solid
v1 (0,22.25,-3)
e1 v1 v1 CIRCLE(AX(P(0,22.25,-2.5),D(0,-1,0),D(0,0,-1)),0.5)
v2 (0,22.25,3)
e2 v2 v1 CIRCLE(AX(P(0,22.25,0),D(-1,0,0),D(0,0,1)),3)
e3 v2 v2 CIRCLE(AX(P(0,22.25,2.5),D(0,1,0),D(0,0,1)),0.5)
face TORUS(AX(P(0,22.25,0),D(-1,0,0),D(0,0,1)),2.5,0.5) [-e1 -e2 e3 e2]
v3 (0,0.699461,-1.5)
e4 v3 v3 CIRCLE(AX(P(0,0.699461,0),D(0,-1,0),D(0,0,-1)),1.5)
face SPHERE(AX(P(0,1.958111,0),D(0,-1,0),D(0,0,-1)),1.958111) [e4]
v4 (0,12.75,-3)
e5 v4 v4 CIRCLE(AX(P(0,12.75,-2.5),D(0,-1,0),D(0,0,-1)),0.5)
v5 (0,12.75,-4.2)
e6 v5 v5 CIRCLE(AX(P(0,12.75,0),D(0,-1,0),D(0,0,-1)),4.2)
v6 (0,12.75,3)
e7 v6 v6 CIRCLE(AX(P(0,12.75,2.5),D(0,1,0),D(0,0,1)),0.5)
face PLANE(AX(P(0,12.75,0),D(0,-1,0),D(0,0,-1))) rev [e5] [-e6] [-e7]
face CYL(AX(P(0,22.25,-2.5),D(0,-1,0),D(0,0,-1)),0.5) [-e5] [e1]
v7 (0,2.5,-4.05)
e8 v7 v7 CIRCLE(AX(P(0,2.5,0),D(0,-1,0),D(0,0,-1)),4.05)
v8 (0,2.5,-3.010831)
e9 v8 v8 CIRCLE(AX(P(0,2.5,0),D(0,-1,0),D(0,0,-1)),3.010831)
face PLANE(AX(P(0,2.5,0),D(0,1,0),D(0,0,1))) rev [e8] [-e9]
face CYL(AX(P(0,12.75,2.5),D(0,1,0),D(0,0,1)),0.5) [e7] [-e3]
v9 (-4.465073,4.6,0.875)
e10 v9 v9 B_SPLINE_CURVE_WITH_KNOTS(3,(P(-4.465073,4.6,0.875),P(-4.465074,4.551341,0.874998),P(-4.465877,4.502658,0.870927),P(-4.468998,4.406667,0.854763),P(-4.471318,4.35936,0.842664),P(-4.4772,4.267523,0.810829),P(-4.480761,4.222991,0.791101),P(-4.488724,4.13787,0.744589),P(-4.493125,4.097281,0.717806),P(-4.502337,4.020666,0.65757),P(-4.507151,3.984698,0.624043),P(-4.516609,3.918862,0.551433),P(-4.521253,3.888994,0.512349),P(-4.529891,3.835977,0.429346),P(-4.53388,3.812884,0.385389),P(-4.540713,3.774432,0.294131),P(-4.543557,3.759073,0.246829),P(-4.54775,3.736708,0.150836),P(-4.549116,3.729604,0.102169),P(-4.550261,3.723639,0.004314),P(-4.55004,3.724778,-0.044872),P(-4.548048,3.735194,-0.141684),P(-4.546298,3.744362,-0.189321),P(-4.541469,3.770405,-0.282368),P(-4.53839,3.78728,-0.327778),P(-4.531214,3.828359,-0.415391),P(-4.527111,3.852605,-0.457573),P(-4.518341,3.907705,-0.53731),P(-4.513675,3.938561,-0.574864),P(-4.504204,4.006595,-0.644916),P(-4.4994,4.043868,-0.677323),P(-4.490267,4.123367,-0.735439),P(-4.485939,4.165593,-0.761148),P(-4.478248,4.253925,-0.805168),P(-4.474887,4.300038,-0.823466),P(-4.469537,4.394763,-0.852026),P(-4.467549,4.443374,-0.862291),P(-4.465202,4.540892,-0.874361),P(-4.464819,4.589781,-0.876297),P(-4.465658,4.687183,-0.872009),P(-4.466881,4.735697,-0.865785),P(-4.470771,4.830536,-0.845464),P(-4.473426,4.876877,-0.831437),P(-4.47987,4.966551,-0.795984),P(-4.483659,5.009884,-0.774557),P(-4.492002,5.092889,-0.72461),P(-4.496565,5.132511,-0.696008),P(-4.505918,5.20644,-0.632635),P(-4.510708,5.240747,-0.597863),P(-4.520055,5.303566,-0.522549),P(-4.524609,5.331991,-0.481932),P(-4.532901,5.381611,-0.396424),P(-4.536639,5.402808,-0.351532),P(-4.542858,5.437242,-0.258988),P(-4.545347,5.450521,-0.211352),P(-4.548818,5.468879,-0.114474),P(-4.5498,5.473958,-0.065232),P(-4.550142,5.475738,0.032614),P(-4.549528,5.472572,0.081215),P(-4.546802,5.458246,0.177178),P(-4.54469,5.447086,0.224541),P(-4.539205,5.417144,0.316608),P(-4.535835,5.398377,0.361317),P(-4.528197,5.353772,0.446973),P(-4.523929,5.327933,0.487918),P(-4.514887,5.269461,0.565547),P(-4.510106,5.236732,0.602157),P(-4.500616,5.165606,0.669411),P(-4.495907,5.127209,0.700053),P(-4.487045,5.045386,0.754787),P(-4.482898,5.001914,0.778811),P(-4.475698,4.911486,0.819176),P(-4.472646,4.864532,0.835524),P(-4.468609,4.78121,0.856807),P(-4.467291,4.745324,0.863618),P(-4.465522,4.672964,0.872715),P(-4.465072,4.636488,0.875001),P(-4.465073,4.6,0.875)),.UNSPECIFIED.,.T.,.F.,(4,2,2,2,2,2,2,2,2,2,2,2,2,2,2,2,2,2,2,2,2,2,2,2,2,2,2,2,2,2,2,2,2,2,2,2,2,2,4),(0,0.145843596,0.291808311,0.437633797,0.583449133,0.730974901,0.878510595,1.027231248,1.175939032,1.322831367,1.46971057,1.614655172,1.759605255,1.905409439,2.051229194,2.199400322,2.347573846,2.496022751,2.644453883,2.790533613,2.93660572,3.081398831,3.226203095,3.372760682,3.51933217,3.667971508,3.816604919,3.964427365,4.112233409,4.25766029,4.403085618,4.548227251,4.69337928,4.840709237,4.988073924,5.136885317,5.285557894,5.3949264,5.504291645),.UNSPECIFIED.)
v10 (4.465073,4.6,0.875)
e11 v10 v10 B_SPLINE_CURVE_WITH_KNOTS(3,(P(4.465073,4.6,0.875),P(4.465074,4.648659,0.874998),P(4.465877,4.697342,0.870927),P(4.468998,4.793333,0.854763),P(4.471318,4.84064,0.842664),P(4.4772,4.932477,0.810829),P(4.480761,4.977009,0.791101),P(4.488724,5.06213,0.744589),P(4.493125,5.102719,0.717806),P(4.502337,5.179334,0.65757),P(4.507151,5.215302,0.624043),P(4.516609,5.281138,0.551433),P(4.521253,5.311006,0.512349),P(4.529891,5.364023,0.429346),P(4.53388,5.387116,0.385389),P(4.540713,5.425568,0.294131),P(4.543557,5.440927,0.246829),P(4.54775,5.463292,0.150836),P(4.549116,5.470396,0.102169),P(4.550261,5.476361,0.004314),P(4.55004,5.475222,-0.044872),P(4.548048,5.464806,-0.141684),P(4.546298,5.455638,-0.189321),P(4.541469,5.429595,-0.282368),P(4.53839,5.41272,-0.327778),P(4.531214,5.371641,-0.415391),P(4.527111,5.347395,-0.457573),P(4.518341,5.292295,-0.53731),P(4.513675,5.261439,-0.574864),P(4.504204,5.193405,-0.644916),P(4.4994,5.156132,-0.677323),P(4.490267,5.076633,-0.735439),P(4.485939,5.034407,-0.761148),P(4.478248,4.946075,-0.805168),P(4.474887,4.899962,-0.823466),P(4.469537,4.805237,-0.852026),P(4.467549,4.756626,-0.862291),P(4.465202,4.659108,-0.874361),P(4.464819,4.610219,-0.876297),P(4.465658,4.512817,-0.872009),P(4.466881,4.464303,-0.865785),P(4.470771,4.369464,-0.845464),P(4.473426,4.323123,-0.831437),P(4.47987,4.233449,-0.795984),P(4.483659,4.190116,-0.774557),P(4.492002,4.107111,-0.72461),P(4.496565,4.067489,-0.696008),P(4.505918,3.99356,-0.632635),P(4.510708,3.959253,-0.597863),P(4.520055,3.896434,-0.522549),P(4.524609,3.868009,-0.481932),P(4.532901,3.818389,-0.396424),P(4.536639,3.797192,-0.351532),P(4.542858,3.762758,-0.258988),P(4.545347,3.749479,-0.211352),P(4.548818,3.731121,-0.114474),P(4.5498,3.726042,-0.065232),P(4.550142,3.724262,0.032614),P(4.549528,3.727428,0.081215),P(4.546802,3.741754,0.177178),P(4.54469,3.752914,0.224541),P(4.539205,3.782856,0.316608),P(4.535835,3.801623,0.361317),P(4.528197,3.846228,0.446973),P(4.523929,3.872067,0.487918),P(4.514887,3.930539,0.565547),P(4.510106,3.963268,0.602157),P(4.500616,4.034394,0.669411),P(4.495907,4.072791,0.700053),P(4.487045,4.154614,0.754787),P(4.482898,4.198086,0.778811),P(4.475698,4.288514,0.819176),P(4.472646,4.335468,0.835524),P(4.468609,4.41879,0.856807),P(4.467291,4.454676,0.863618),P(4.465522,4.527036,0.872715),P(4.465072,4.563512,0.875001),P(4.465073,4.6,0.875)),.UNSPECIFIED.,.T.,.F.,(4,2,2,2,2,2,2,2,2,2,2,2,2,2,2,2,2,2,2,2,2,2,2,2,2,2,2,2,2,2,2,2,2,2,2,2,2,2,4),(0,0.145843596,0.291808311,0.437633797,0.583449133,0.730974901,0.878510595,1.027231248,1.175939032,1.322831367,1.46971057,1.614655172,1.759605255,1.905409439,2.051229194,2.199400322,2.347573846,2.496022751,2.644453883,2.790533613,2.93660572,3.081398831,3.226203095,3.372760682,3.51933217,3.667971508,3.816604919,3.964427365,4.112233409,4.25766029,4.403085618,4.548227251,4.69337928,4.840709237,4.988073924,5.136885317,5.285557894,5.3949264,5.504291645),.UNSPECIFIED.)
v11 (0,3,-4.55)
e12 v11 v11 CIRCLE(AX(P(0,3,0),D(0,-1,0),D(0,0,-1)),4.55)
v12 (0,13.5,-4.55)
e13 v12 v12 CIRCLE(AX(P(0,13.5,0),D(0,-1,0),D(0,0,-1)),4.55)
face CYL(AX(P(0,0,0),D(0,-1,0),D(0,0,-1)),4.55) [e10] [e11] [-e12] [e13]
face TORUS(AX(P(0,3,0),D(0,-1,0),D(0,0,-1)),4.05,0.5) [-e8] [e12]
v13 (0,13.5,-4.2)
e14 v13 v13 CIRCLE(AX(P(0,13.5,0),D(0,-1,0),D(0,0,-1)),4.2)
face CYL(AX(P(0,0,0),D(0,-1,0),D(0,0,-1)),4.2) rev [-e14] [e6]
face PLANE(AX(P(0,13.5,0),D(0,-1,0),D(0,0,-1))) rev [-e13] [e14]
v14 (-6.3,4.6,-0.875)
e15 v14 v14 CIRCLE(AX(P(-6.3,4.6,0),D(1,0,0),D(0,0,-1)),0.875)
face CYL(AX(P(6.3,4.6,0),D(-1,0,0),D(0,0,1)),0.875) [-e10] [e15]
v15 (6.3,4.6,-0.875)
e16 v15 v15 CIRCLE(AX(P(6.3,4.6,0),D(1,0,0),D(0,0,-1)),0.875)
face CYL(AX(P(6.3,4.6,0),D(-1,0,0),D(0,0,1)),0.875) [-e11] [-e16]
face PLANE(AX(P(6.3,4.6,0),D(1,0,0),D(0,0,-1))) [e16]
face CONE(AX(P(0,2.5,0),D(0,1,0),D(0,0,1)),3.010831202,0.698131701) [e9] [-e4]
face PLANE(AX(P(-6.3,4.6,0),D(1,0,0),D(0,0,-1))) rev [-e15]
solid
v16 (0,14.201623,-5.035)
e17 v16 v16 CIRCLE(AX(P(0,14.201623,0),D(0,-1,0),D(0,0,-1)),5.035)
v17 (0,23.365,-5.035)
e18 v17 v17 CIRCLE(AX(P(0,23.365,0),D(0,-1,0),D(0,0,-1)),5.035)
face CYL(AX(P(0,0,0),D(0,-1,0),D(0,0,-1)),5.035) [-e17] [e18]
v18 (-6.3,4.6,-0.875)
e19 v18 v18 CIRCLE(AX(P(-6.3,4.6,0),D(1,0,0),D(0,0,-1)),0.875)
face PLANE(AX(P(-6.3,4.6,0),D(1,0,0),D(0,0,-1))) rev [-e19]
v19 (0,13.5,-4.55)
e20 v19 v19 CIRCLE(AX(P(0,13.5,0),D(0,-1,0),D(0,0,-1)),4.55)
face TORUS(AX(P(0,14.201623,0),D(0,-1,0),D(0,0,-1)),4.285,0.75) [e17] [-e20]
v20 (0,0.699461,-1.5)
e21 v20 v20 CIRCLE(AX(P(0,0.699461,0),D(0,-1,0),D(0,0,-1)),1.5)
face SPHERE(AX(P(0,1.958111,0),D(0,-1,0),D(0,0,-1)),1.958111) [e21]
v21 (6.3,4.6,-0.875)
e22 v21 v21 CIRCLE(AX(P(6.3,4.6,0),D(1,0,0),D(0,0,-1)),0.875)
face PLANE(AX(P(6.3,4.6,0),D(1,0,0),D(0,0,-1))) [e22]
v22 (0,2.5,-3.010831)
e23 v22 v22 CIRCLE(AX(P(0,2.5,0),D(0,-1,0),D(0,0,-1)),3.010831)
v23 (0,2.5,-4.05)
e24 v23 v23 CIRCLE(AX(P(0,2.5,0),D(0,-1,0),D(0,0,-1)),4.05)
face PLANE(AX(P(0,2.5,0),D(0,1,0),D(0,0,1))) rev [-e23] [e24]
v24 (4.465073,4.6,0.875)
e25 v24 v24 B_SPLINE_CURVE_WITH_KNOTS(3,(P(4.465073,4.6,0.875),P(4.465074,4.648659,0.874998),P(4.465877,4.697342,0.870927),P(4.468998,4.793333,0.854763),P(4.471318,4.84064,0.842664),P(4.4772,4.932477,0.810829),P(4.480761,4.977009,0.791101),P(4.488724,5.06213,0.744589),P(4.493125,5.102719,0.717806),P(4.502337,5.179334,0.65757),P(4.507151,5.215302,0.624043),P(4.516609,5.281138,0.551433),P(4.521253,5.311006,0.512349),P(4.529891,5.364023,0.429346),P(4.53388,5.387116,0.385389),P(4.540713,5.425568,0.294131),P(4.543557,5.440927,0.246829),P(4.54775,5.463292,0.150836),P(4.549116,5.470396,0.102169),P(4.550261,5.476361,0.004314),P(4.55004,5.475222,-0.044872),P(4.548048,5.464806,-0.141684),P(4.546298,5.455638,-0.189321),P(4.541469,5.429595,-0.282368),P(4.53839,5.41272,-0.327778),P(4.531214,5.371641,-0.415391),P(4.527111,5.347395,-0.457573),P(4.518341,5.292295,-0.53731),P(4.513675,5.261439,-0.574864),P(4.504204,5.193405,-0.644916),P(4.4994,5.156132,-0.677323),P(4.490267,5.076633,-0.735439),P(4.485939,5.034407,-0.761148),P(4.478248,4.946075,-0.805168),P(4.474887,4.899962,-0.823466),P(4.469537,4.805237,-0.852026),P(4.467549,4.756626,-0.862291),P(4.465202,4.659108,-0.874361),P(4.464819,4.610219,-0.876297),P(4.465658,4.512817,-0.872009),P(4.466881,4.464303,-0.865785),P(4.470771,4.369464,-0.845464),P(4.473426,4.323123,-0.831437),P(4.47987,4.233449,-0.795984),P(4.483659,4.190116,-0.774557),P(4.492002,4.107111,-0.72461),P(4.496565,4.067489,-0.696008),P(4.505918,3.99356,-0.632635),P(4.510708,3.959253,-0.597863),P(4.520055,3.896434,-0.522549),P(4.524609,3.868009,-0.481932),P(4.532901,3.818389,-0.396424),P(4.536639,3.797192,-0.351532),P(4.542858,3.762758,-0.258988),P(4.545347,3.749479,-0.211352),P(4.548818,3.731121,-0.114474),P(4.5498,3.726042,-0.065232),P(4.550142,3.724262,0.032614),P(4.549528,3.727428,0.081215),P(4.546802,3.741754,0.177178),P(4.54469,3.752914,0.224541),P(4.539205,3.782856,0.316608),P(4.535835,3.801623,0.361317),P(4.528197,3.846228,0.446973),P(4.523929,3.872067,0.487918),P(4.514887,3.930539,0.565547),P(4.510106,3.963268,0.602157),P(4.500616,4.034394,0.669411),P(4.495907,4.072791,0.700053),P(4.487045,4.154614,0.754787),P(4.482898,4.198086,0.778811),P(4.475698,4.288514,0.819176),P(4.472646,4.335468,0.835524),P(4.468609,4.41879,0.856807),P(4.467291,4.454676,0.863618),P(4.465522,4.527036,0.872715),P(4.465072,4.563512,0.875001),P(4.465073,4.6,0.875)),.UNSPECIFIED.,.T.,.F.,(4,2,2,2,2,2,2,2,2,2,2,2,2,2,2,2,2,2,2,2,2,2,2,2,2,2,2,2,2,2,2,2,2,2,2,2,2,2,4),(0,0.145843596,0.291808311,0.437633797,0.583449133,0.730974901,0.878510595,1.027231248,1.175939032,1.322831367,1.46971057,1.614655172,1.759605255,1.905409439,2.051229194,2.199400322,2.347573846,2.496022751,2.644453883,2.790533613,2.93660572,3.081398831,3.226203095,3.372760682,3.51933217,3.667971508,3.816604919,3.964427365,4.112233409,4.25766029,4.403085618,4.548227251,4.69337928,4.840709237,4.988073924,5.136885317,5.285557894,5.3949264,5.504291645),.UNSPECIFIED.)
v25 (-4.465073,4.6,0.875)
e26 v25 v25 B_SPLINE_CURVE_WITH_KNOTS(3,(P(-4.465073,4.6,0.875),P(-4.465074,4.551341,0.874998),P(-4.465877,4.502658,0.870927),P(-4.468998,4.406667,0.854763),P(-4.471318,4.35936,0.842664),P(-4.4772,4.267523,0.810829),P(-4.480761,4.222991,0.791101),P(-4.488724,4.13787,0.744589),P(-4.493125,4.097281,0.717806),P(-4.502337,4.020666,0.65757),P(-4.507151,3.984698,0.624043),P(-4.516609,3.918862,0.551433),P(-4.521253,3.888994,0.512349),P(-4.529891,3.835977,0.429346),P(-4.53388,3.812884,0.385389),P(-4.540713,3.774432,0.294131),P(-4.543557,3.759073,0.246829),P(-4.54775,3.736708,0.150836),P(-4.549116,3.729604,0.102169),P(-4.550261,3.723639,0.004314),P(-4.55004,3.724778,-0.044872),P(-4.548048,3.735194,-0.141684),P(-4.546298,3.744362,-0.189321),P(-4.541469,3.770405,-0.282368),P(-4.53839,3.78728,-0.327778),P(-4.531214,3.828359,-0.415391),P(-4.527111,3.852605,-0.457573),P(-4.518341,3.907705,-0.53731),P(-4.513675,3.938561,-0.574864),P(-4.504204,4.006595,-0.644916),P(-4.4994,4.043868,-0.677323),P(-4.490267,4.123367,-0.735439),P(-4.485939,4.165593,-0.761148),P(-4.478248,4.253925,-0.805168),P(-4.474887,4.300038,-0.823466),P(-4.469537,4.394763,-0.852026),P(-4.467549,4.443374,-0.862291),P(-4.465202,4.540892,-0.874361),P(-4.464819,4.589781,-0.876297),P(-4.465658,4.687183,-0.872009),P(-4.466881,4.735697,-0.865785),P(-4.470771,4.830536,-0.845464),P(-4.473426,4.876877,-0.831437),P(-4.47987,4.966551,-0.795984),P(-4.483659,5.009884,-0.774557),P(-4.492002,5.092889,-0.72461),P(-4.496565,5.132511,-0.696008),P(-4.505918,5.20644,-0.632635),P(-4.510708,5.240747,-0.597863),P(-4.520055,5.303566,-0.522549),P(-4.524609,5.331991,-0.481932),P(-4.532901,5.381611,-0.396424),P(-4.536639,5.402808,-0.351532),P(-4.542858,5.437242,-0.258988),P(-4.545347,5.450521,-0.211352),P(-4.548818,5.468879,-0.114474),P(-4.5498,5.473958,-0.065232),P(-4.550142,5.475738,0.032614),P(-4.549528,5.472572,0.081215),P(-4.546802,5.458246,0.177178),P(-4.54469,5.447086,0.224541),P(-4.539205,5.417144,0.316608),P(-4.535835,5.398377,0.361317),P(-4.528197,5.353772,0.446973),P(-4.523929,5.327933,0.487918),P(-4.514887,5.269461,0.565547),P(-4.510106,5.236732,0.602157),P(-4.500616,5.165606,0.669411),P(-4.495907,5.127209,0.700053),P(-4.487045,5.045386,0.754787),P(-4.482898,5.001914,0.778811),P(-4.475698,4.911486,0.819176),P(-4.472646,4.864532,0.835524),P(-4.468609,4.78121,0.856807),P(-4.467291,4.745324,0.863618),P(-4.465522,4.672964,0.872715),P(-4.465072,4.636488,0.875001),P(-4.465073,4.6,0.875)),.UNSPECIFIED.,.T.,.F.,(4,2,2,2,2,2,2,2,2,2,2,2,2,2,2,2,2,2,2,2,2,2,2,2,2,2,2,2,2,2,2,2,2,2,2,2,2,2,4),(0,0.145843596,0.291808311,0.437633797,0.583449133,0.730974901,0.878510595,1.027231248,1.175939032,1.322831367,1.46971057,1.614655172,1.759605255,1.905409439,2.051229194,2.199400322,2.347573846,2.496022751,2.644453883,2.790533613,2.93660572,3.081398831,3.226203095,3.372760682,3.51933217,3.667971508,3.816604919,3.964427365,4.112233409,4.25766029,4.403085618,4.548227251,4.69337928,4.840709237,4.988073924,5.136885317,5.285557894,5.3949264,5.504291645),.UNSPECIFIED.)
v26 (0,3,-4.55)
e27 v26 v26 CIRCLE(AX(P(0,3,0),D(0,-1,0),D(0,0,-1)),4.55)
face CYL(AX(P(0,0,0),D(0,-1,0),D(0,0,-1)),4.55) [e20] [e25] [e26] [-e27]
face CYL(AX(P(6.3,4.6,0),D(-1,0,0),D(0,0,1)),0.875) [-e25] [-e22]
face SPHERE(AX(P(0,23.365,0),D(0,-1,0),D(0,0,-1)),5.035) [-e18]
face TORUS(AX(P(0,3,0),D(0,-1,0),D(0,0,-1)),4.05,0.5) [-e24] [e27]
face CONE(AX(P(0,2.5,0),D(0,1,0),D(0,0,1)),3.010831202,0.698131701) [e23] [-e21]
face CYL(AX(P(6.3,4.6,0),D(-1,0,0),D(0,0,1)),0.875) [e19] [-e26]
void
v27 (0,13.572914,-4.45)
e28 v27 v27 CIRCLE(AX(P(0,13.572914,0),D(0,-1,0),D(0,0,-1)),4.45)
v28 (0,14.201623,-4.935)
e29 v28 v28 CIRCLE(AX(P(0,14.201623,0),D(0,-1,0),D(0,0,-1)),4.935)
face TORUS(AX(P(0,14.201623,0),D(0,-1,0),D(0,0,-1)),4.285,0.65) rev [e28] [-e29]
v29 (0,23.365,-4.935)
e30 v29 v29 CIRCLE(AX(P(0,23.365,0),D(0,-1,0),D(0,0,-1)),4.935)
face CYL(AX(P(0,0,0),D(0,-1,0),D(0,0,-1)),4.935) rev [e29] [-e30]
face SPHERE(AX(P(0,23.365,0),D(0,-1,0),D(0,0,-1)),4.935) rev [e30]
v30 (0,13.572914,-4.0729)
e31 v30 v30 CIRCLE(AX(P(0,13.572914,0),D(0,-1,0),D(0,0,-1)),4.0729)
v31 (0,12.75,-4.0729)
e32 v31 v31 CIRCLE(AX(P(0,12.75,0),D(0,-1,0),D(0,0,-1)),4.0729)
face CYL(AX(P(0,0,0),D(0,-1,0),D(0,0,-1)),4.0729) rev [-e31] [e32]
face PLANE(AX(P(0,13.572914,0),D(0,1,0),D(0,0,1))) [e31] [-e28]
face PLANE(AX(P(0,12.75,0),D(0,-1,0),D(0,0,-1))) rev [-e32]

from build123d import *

# Parameters (mm, degrees)
SKETCH2_R           = 0.875
BOSS_EXTRUDE1_DEPTH = 6.3
SWEEP1_START        = -6.3
SWEEP1_OUTLINE_R    = 0.875
SWEEP1_DEPTH        = 12.6
SWEEP1_3_OUTLINE_R  = 0.5
SWEEP1_3_ANGLE      = 180
SWEEP1_START_2      = 12
SWEEP1_4_OUTLINE_R  = 0.5
SWEEP1_4_DEPTH      = 10.2500001
SWEEP1_5_OUTLINE_R  = 0.5
SWEEP1_5_DEPTH      = 10.2500001


with BuildPart() as part:
    # Sketch1 → Revolve1 (revolve)
    with BuildSketch(Plane(origin=(0, 0, 0), x_dir=(0, 0, -1), z_dir=(1, 0, 0))):
        with BuildLine():
            ThreePointArc((1.5, 0.699461487), (0.827533439, 0.183459747), (0, 0))
            Line((0, 0), (0, 12.75))
            Line((0, 12.75), (4.2, 12.75))
            Line((4.2, 12.75), (4.2, 13.5))
            Line((4.2, 13.5), (4.55, 13.5))
            Line((4.55, 13.5), (4.55, 3))
            ThreePointArc((4.55, 3), (4.403553391, 2.646446609), (4.05, 2.5))
            Line((4.05, 2.5), (3.010831202, 2.5))
            Line((3.010831202, 2.5), (1.5, 0.699461487))
        make_face()
    revolve(axis=Axis((0, 0, 0), (0, 1, 0)))

    # Sketch2 → Boss-Extrude1 (add, symmetric)
    with BuildSketch(Plane(origin=(0, 0, 0), x_dir=(0, 0, -1), z_dir=(1, 0, 0))):
        with Locations(Location((0, 4.6, 0), (0, 0, 180))):
            Circle(SKETCH2_R)
    extrude(amount=BOSS_EXTRUDE1_DEPTH, both=True)

    # Sweep1 3 outline → Sweep1 3 (revolve)
    with BuildSketch(Plane(origin=(0, 22.25, 0), x_dir=(0, 0, -1), z_dir=(0, -1, 0))):
        with Locations((2.5, 0)):
            Circle(SWEEP1_3_OUTLINE_R)
    revolve(axis=Axis((0, 22.25, 0), (1, 0, 0)), revolution_arc=SWEEP1_3_ANGLE)

    # Sweep1 4 outline → Sweep1 4 (add)
    with BuildSketch(Plane(origin=(0, 0, 0), x_dir=(1, 0, 0), z_dir=(0, 1, 0)).offset(SWEEP1_START_2)):
        with Locations((0, -2.5)):
            Circle(SWEEP1_4_OUTLINE_R)
    extrude(amount=SWEEP1_4_DEPTH)

    # Sweep1 5 outline → Sweep1 5 (add)
    with BuildSketch(Plane(origin=(0, 0, 0), x_dir=(1, 0, 0), z_dir=(0, 1, 0)).offset(SWEEP1_START_2)):
        with Locations((0, 2.5)):
            Circle(SWEEP1_5_OUTLINE_R)
    extrude(amount=SWEEP1_5_DEPTH)


with BuildPart() as body_2:
    # Sketch1<3> → Revolve2 (revolve)
    with BuildSketch(Plane(origin=(0, 0, 0), x_dir=(0, 0, -1), z_dir=(1, 0, 0))):
        with BuildLine():
            Line((4.2, 13.5), (4.55, 13.5))
            ThreePointArc((4.55, 13.5), (4.901948134, 13.775155065), (5.035, 14.201623118))
            Line((5.035, 14.201623118), (5.035, 23.365))
            ThreePointArc((5.035, 23.365), (3.560282643, 26.925282643), (0, 28.4))
            Line((0, 28.4), (0, 28.3))
            ThreePointArc((0, 28.3), (3.489571965, 26.854571965), (4.935, 23.365))
            Line((4.935, 23.365), (4.935, 14.201623118))
            ThreePointArc((4.935, 14.201623118), (4.799660082, 13.804602968), (4.45, 13.572914124))
            Line((4.45, 13.572914124), (4.072899594, 13.572914124))
            Line((4.072899594, 13.572914124), (4.072899594, 12.75))
            Line((4.072899594, 12.75), (4.2, 12.75))
            Line((4.2, 12.75), (4.2, 13.5))
        make_face()
    revolve(axis=Axis((0, 0, 0), (0, 1, 0)))

    # Sweep1: read off the stored shape, not the designer's step
    # Sweep1 outline → Sweep1 (add)
    with BuildSketch(Plane.YZ.offset(SWEEP1_START)):
        with Locations((4.6, 0)):
            Circle(SWEEP1_OUTLINE_R)
    extrude(amount=SWEEP1_DEPTH)

    # Sweep1 2 outline → Sweep1 2 (revolve)
    with BuildSketch(Plane.XY):
        with BuildLine():
            Line((4.55, 13.5), (4.2, 13.5))
            Line((4.2, 13.5), (4.2, 12.75))
            Line((4.2, 12.75), (0, 12.75))
            Line((0, 12.75), (0, 0))
            ThreePointArc((0, 0), (0.82753344, 0.183459747), (1.500000001, 0.699461489))
            Line((1.500000001, 0.699461489), (3.010831202, 2.5))
            Line((3.010831202, 2.5), (4.05, 2.5))
            ThreePointArc((4.05, 2.5), (4.403553391, 2.646446609), (4.55, 3))
            Line((4.55, 3), (4.55, 13.5))
        make_face()
    revolve(axis=Axis((0, 0, 0), (0, 1, 0)))


solid = Compound([part.part, body_2.part])
